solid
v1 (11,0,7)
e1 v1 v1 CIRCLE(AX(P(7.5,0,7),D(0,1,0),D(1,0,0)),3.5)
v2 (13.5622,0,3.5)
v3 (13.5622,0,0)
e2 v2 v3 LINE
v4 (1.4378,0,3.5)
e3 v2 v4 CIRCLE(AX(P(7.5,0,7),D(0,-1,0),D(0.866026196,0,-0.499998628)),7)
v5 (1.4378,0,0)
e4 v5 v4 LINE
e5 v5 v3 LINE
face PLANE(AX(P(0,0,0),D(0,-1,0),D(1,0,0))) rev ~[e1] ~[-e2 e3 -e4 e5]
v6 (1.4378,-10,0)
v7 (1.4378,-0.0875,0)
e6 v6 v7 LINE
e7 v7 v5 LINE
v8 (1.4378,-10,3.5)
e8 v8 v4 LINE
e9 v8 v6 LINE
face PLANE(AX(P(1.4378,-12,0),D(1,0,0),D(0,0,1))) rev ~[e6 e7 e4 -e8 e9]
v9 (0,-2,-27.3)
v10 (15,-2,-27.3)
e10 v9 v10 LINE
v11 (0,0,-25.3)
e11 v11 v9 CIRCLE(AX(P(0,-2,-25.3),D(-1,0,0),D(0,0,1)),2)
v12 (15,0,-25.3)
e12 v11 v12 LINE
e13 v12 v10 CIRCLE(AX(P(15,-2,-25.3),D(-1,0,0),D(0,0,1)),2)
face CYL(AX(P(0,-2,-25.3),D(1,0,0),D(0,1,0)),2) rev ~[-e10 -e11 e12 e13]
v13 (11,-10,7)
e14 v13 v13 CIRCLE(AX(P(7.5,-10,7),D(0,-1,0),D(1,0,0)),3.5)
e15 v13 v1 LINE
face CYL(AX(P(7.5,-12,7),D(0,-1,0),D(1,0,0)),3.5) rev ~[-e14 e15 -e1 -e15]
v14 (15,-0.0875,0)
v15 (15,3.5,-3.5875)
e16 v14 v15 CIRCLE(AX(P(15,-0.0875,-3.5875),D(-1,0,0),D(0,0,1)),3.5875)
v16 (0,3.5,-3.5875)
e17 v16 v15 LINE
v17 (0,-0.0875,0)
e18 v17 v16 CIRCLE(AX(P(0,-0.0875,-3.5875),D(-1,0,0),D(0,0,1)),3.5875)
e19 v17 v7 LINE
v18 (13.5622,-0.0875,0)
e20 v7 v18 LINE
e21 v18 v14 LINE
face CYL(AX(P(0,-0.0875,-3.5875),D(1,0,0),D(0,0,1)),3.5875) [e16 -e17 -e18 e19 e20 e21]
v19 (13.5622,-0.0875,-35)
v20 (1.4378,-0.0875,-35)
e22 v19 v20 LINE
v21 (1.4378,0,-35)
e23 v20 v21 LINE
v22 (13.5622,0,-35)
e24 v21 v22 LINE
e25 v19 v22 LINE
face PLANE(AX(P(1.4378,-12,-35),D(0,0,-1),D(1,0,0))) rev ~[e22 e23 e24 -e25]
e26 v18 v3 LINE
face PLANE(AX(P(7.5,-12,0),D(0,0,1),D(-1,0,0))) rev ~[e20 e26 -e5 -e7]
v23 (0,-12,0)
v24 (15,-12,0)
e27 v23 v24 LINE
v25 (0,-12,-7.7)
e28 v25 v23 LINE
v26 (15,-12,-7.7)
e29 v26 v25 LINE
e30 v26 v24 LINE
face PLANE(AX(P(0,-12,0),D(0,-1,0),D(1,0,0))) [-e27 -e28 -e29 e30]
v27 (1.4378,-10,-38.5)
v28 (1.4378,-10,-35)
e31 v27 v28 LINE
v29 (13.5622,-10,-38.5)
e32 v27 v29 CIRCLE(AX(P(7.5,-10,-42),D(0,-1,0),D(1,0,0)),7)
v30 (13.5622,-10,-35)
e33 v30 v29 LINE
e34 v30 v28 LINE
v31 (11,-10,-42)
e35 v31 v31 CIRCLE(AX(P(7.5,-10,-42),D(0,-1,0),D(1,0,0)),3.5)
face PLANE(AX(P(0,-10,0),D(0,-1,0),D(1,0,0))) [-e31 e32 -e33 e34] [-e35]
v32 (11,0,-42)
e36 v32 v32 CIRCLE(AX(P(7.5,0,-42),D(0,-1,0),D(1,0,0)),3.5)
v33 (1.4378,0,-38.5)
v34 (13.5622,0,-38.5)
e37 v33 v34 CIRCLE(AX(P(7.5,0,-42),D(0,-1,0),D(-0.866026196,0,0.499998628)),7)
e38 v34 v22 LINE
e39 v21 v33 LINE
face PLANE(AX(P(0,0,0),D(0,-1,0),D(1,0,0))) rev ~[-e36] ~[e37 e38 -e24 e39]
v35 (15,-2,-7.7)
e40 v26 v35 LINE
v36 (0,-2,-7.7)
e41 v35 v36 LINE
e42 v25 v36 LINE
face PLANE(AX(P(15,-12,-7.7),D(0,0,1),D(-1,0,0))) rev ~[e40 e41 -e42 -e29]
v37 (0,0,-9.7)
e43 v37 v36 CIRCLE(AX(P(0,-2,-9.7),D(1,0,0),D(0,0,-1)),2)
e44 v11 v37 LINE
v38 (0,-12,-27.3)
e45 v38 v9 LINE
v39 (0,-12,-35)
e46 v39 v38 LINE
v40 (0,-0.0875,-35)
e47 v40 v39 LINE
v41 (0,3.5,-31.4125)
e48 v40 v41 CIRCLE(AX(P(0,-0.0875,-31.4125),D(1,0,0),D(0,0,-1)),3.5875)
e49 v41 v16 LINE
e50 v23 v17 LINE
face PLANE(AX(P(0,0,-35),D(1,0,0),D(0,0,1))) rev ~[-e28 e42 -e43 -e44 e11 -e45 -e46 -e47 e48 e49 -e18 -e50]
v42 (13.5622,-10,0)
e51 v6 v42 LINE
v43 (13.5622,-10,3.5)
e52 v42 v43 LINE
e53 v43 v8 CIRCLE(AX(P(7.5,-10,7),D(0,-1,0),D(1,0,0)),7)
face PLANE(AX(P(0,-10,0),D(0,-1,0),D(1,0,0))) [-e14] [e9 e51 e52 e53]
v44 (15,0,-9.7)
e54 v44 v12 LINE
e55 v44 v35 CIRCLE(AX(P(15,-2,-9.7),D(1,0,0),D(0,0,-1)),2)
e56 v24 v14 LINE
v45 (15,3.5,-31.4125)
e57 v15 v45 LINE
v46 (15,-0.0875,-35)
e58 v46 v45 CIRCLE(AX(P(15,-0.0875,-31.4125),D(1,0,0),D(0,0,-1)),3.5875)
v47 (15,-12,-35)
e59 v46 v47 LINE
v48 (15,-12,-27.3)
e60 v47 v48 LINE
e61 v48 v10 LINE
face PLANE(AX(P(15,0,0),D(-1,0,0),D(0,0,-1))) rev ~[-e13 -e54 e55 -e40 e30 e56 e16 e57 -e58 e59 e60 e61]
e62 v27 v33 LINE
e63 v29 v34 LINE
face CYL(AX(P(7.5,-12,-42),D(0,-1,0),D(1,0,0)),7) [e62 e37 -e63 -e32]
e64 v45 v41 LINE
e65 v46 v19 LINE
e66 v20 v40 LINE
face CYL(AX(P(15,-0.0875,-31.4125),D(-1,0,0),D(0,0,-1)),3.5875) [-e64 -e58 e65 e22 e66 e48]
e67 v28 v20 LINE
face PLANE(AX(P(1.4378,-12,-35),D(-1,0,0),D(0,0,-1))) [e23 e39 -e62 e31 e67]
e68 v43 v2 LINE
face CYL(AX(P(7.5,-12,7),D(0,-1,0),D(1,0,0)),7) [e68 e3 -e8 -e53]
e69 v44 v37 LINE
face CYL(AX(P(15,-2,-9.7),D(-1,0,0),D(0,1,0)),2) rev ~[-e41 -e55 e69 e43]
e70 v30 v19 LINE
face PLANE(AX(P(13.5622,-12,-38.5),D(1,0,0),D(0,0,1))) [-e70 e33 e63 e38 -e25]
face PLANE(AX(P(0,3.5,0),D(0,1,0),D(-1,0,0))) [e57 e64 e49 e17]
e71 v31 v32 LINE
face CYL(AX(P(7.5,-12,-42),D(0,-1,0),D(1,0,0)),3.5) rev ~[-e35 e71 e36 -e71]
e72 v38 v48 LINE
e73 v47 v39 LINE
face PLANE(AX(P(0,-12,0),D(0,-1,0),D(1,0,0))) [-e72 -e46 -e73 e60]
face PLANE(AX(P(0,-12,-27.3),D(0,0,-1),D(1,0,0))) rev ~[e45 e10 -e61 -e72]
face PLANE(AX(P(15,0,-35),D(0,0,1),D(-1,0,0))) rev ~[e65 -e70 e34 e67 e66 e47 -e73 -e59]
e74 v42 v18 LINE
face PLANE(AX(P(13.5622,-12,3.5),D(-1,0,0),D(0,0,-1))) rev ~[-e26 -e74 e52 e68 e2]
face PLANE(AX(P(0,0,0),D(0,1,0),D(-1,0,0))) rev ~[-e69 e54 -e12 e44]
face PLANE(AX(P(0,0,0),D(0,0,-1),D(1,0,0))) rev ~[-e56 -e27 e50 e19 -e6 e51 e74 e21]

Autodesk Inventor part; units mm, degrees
ref_plane "YZ Plane" through (0, 0, 0) normal (1, 0, 0) x (0, 1, 0)
ref_plane "XZ Plane" through (0, 0, 0) normal (0, 1, 0) x (-1, 0, 0)
ref_plane "XY Plane" through (0, 0, 0) normal (0, 0, 1) x (1, 0, 0)
sketch "Sketch1" plane through (0, 0, 0) normal (1, 0, 0) x (0, 1, 0)
  point P0 (0, 0)
sketch "Sketch2" plane through (0, 0, 0) normal (0, 1, 0) x (-1, 0, 0)
  point P0 (0, 0)
sketch "Sketch3" plane through (0, 0, 0) normal (0, 1, 0) x (-1, 0, 0)
  line L0 (0, 0) -> (-15, 0)
  line L1 (-15, 0) -> (-15, -35)
  line L2 (-15, -35) -> (0, -35)
  line L3 (0, -35) -> (0, 0)
  dimension "d0" = 35
  dimension "d1" = 15
extrude "Extrusion1" add sketch "Sketch3" along normal blind 3.5
sketch "Sketch4" plane through (0, 0, 0) normal (0, -1, 0) x (1, 0, 0)
  point P0 (0, 0)
sketch "Sketch5" plane through (0, 0, 0) normal (0, -1, 0) x (1, 0, 0)
  line L0 (15, 0) -> (15, -35) projected
  line L1 (15, 0) -> (0, 0)
  line L2 (0, 0) -> (0, -6.5)
  line L3 (0, -6.5) -> (15, -6.5)
  line L4 (15, -6.5) -> (15, 0)
  line L5 (0, -35) -> (0, 0) projected
  line L6 (15, -35) -> (0, -35)
  line L7 (0, -35) -> (0, -28.5)
  line L8 (0, -28.5) -> (15, -28.5)
  line L9 (15, -28.5) -> (15, -35)
  dimension "d4" = 6.5
  dimension "d5" = 6.5
extrude "Extrusion2" add sketch "Sketch5" along normal blind 12 contours L0 L3 L2 L1 | L0 L6 L5 L8
fillet "Fillet2" radius 3.5875 2 edges at (7.5, 3.5, -35) (7.5, 3.5, 0)
sketch "Sketch7" plane through (0, 3.5, 0) normal (0, 1, 0) x (1, 0, 0)
  point P0 (0, 0)
sketch "Sketch8" plane through (0, -12, 0) normal (0, -1, 0) x (1, 0, 0)
  circle A0 centre (7.5, 7) radius 7
  circle A1 centre (7.5, -42) radius 7
  line L0 (15, 0) -> (0, 0) projected
  line L1 (0, -35) -> (15, -35) projected
  circle A2 centre (7.5, 7) radius 3.5
  circle A3 centre (7.5, -42) radius 3.5
  line L2 (0, 0) -> (15, 0) projected
  line L3 (13.5622, 0) -> (1.4378, 0)
  line L4 (1.4378, 0) -> (1.4378, 3.5)
  line L5 (1.4378, 3.5) -> (13.5622, 3.5)
  line L6 (13.5622, 3.5) -> (13.5622, 0)
  line L7 (13.5622, -35) -> (1.4378, -35)
  line L8 (1.4378, -35) -> (1.4378, -38.5)
  line L9 (1.4378, -38.5) -> (13.5622, -38.5)
  line L10 (13.5622, -38.5) -> (13.5622, -35)
  point P0 (7.5, 0)
  point P1 (7.5, -35)
  dimension "d14" = 14
  dimension "d15" = 14
  dimension "d16" = 7
  dimension "d17" = 7
extrude "Extrusion4" add sketch "Sketch8" against normal blind 12 contours A0 L5 | L5 A0 | L6 L0 A0 | A1 L9 | L9 A1 | A1 L1 L10 | L8 L1 A1
sketch "Sketch9" plane through (0, -12, 0) normal (0, -1, 0) x (1, 0, 0)
  line L0 (7.5, 0) -> (13.5622, 0) projected
  line L1 (7.5, 0) -> (1.4378, 0)
  line L2 (1.4378, 0) -> (1.4378, 3.5)
  line L3 (1.4378, 3.5) -> (7.5, 3.5)
  line L4 (7.5, 3.5) -> (7.5, 0)
  arc A0 (13.5622, 3.5) -> (7.5, 0) centre (7.5, 7) ccw projected
  point P0 (0, 0)
extrude "Extrusion5" add sketch "Sketch9" against normal blind 12
sketch "Sketch10" plane through (0, -12, 0) normal (0, -1, 0) x (1, 0, 0)
  line L0 (15, 0) -> (13.5622, 0) projected
  line L1 (15, 0) -> (0, 0)
  line L2 (0, 0) -> (0, 14.6227)
  line L3 (0, 14.6227) -> (15, 14.6227)
  line L4 (15, 14.6227) -> (15, 0)
  line L5 (15, -31.4125) -> (15, -35) projected
  line L6 (15, -35) -> (0, -35)
  line L7 (0, -35) -> (0, -49.9262)
  line L8 (0, -49.9262) -> (15, -49.9262)
  line L9 (15, -49.9262) -> (15, -35)
  point P0 (0, 0)
extrude "Extrusion6" cut sketch "Sketch10" against normal blind 2
sketch "Sketch11" plane through (0, -12, 0) normal (0, -1, 0) x (1, 0, 0)
  line L0 (0, -6.5) -> (15, -6.5) projected
  line L1 (0, -6.5) -> (15, -6.5)
  line L2 (15, -6.5) -> (15, -7.7)
  line L3 (15, -7.7) -> (0, -7.7)
  line L4 (0, -7.7) -> (0, -6.5)
  line L5 (15, -6.5) -> (15, -28.5) projected
  line L6 (0, -28.5) -> (0, -6.5) projected
  line L7 (15, -28.5) -> (0, -28.5)
  line L8 (0, -28.5) -> (0, -27.3)
  line L9 (0, -27.3) -> (15, -27.3)
  line L10 (15, -27.3) -> (15, -28.5)
  point P0 (0, 0)
  dimension "d24" = 1.2
  dimension "d25" = 1.2
extrude "Extrusion7" add sketch "Sketch11" against normal blind 12 contours L0 L2 L3 L4 | L9 L5 L7 L6
fillet "Fillet4" radius 2 2 edges at (7.5, 0, -7.7) (7.5, 0, -27.3)
properties part number "HP45 Printhead Cap"
